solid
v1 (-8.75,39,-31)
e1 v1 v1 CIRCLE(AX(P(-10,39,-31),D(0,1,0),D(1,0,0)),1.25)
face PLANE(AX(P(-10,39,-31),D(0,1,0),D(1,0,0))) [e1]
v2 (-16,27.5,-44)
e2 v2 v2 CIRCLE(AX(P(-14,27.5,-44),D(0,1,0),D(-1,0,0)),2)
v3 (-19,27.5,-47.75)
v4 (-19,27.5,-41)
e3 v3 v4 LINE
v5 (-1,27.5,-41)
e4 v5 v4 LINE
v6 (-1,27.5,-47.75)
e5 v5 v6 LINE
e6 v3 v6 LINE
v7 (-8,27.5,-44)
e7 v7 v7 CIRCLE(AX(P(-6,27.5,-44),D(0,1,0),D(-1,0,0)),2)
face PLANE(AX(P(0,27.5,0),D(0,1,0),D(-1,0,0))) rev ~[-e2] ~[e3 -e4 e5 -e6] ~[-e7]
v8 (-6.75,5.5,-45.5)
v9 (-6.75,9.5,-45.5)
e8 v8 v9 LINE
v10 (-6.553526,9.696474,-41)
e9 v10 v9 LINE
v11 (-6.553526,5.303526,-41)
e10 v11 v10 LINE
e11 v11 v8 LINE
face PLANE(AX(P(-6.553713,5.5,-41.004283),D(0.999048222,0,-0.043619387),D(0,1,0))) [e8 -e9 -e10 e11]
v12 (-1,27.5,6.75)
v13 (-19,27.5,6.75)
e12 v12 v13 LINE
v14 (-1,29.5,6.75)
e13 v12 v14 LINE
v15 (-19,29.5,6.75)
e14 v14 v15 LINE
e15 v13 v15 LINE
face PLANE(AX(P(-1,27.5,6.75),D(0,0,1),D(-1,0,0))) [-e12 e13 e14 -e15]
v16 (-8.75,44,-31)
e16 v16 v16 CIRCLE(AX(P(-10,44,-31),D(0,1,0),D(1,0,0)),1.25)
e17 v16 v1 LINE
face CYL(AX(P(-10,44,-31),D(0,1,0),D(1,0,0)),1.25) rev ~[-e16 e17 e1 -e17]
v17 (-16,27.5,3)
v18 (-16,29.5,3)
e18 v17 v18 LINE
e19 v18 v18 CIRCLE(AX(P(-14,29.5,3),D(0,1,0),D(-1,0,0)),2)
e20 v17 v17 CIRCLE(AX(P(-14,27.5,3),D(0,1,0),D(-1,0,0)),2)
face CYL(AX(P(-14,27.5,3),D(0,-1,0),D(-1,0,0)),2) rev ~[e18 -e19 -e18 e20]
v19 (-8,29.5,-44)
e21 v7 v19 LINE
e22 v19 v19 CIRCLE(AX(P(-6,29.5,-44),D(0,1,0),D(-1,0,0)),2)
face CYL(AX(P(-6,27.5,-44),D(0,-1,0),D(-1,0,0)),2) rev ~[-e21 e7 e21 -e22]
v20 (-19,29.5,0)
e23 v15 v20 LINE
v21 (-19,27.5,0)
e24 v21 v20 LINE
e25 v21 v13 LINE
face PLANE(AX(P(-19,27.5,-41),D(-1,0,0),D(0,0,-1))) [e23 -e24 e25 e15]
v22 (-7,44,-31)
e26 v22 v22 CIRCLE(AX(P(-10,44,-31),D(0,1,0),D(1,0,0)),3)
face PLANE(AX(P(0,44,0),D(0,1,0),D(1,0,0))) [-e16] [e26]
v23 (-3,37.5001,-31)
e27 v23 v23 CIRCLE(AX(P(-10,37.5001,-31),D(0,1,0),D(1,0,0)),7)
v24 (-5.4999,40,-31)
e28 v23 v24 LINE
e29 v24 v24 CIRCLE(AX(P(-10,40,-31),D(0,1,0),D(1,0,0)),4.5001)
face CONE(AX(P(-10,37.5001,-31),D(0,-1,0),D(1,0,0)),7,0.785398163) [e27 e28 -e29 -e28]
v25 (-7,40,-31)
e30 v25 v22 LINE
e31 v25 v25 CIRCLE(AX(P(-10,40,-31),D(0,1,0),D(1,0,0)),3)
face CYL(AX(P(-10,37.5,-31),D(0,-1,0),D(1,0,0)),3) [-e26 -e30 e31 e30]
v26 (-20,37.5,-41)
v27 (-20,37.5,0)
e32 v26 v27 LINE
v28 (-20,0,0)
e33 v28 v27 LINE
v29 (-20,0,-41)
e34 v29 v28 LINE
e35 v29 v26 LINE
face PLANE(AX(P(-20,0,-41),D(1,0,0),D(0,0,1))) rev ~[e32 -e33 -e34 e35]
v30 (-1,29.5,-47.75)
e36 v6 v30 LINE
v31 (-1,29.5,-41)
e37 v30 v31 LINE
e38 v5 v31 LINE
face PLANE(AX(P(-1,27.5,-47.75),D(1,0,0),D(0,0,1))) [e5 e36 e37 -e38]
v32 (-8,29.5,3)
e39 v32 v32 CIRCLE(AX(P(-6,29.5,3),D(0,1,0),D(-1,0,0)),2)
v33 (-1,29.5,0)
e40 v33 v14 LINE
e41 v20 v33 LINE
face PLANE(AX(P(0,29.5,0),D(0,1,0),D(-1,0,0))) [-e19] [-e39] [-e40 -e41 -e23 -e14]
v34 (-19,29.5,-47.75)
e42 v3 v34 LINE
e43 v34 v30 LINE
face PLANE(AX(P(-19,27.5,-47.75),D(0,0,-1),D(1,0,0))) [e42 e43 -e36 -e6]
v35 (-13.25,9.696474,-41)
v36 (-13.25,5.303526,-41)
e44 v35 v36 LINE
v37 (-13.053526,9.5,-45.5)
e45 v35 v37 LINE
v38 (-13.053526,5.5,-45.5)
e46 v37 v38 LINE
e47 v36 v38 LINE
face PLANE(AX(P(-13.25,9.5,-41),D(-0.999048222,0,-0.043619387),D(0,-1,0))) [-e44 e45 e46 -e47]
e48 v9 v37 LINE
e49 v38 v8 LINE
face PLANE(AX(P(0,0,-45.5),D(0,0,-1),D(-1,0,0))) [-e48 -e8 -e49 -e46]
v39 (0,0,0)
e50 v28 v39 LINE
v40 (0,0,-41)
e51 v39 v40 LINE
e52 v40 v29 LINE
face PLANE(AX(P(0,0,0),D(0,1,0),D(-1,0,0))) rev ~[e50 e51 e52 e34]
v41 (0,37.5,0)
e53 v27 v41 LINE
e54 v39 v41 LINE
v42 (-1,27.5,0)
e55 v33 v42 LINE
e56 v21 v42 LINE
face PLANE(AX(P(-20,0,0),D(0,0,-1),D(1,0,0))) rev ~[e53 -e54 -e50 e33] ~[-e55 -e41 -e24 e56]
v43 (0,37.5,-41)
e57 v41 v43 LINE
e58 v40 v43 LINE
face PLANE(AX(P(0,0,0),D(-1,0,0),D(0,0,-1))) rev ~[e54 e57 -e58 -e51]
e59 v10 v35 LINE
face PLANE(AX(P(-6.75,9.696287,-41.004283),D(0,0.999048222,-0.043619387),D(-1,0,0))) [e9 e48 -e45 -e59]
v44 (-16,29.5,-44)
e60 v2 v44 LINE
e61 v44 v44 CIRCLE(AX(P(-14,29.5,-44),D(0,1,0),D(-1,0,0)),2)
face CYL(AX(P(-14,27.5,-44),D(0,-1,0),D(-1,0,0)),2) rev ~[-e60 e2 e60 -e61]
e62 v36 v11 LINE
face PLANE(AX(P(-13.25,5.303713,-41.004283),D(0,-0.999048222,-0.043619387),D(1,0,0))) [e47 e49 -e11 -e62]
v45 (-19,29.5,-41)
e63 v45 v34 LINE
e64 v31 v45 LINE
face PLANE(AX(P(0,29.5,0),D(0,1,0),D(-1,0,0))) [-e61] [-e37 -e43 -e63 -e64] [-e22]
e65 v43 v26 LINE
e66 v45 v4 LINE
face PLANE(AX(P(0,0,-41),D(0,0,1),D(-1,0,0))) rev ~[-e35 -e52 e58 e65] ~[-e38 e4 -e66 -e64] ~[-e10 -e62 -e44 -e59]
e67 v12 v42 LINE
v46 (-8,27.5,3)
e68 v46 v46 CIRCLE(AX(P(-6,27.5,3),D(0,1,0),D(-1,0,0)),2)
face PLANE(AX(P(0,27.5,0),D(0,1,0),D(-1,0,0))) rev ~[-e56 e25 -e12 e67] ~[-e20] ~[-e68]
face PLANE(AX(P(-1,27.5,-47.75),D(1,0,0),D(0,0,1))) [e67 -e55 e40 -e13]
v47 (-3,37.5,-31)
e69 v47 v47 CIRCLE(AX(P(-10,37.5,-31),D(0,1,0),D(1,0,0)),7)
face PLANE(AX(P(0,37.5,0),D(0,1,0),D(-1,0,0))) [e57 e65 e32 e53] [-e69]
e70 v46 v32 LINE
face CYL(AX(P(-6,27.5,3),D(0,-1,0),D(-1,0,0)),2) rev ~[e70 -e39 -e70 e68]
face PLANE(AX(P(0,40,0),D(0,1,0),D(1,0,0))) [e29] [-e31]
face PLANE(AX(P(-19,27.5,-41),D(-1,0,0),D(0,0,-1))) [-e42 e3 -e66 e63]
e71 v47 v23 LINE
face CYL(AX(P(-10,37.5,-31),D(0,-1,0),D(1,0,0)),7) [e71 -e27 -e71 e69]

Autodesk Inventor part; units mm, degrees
ref_plane "YZ Plane" through (0, 0, 0) normal (1, 0, 0) x (0, 1, 0)
ref_plane "XY Plane" through (0, 0, 0) normal (0, 0, 1) x (1, 0, 0)
sketch "Sketch1" plane through (0, 0, 0) normal (0, 1, 0) x (-1, 0, 0)
  line L0 (20, 0) -> (0, 0)
  line L1 (0, 0) -> (0, -41)
  line L2 (0, -41) -> (20, -41)
  line L3 (20, -41) -> (20, 0)
  dimension "d0" = 20
  dimension "d1" = 41
extrude "Extrusion1" add sketch "Sketch1" along normal blind 37.5
sketch "Sketch2" plane through (0, 37.5, 0) normal (0, 1, 0) x (1, 0, 0)
  circle A0 centre (-10, 31) radius 3
  line L0 (-20, 41) -> (-20, 0) projected
  line L1 (0, 41) -> (-20, 41) projected
  point P0 (0, 0)
  dimension "d4" = 6
  dimension "d5" = 10
  dimension "d6" = 10
extrude "Extrusion2" add sketch "Sketch2" along normal blind 6.5
sketch "Sketch3" plane through (0, 37.5, 0) normal (0, 1, 0) x (1, 0, 0)
  circle A0 centre (-10, 31) radius 3 projected
  circle A1 centre (-10, 31) radius 7
  point P0 (0, 0)
  dimension "d9" = 14
extrude "Extrusion3" add sketch "Sketch3" along normal blind 2.5
chamfer "Chamfer1" distance 2.5 angle 45 1 edges at (-17, 40, -31)
ref_plane "Work Plane1" through (0, 27.5, 0) normal (0, 1, 0) x (-1, 0, 0)
sketch "Sketch4" plane through (0, 27.5, 0) normal (0, 1, 0) x (-1, 0, 0)
  line L0 (19, -47.75) -> (1, -47.75)
  line L1 (1, -47.75) -> (1, 6.75)
  line L2 (1, 6.75) -> (19, 6.75)
  line L3 (19, 6.75) -> (19, -47.75)
  line L4 (0, 0) -> (0, -41) projected
  line L5 (0, -41) -> (20, -41) projected
  line L6 (14, -44) -> (6, -44) construction
  line L7 (6, -44) -> (6, 3) construction
  line L8 (6, 3) -> (14, 3) construction
  line L9 (14, 3) -> (14, -44) construction
  circle A0 centre (14, -44) radius 2
  circle A1 centre (6, -44) radius 2
  circle A2 centre (14, 3) radius 2
  circle A3 centre (6, 3) radius 2
  dimension "d16" = 54.5
  dimension "d17" = 18
  dimension "d18" = 1
  dimension "d19" = 6.75
  dimension "d20" = 47
  dimension "d21" = 8
  dimension "d22" = 5
  dimension "d23" = 3.75
  dimension "d24" = 4
  dimension "d25" = 4
  dimension "d26" = 4
  dimension "d27" = 4
extrude "Extrusion4" add sketch "Sketch4" along normal blind 2
sketch "Sketch5" plane through (-10, 44, -31) normal (0, 1, 0) x (1, 0, 0)
  circle A0 centre (0, 0) radius 3 projected
  circle A1 centre (0, 0) radius 1.25
  point P0 (10, -31)
  dimension "d30" = 2.5
extrude "Extrusion5" cut sketch "Sketch5" against normal blind 5 contours A1
sketch "Sketch6" plane through (0, 0, -41) normal (0, 0, -1) x (-1, 0, 0)
  line L0 (6.75, 9.5) -> (13.25, 9.5)
  line L1 (13.25, 9.5) -> (13.25, 5.5)
  line L2 (13.25, 5.5) -> (6.75, 5.5)
  line L3 (6.75, 5.5) -> (6.75, 9.5)
  line L4 (0, 0) -> (20, 0) projected
  line L5 (0, 0) -> (0, 37.5) projected
  dimension "d33" = 4
  dimension "d34" = 6.5
  dimension "d35" = 5.5
  dimension "d36" = 6.75
extrude "Extrusion6" add sketch "Sketch6" along normal blind 4.5
draft "FaceDraft1" angle 2.5 pull direction (0, 0, -1) faces at (-6.75, 8.1667, -42.5) fixed edges at (-6.75, 7.5, -45.5)
draft "FaceDraft2" angle 2.5 pull direction (0, 0, -1) faces at (-8.8512, 5.5, -42.5) fixed edges at (-10, 5.5, -45.5)
draft "FaceDraft3" angle 2.5 pull direction (0, 0, -1) faces at (-8.8512, 9.5, -42.5) fixed edges at (-10, 9.5, -45.5)
draft "FaceDraft4" angle 2.5 pull direction (0, 0, -1) faces at (-13.25, 6.8333, -42.5) fixed edges at (-13.25, 7.5, -41)
properties part number "HX-15CS_15KGs_metal_gear_servo"
